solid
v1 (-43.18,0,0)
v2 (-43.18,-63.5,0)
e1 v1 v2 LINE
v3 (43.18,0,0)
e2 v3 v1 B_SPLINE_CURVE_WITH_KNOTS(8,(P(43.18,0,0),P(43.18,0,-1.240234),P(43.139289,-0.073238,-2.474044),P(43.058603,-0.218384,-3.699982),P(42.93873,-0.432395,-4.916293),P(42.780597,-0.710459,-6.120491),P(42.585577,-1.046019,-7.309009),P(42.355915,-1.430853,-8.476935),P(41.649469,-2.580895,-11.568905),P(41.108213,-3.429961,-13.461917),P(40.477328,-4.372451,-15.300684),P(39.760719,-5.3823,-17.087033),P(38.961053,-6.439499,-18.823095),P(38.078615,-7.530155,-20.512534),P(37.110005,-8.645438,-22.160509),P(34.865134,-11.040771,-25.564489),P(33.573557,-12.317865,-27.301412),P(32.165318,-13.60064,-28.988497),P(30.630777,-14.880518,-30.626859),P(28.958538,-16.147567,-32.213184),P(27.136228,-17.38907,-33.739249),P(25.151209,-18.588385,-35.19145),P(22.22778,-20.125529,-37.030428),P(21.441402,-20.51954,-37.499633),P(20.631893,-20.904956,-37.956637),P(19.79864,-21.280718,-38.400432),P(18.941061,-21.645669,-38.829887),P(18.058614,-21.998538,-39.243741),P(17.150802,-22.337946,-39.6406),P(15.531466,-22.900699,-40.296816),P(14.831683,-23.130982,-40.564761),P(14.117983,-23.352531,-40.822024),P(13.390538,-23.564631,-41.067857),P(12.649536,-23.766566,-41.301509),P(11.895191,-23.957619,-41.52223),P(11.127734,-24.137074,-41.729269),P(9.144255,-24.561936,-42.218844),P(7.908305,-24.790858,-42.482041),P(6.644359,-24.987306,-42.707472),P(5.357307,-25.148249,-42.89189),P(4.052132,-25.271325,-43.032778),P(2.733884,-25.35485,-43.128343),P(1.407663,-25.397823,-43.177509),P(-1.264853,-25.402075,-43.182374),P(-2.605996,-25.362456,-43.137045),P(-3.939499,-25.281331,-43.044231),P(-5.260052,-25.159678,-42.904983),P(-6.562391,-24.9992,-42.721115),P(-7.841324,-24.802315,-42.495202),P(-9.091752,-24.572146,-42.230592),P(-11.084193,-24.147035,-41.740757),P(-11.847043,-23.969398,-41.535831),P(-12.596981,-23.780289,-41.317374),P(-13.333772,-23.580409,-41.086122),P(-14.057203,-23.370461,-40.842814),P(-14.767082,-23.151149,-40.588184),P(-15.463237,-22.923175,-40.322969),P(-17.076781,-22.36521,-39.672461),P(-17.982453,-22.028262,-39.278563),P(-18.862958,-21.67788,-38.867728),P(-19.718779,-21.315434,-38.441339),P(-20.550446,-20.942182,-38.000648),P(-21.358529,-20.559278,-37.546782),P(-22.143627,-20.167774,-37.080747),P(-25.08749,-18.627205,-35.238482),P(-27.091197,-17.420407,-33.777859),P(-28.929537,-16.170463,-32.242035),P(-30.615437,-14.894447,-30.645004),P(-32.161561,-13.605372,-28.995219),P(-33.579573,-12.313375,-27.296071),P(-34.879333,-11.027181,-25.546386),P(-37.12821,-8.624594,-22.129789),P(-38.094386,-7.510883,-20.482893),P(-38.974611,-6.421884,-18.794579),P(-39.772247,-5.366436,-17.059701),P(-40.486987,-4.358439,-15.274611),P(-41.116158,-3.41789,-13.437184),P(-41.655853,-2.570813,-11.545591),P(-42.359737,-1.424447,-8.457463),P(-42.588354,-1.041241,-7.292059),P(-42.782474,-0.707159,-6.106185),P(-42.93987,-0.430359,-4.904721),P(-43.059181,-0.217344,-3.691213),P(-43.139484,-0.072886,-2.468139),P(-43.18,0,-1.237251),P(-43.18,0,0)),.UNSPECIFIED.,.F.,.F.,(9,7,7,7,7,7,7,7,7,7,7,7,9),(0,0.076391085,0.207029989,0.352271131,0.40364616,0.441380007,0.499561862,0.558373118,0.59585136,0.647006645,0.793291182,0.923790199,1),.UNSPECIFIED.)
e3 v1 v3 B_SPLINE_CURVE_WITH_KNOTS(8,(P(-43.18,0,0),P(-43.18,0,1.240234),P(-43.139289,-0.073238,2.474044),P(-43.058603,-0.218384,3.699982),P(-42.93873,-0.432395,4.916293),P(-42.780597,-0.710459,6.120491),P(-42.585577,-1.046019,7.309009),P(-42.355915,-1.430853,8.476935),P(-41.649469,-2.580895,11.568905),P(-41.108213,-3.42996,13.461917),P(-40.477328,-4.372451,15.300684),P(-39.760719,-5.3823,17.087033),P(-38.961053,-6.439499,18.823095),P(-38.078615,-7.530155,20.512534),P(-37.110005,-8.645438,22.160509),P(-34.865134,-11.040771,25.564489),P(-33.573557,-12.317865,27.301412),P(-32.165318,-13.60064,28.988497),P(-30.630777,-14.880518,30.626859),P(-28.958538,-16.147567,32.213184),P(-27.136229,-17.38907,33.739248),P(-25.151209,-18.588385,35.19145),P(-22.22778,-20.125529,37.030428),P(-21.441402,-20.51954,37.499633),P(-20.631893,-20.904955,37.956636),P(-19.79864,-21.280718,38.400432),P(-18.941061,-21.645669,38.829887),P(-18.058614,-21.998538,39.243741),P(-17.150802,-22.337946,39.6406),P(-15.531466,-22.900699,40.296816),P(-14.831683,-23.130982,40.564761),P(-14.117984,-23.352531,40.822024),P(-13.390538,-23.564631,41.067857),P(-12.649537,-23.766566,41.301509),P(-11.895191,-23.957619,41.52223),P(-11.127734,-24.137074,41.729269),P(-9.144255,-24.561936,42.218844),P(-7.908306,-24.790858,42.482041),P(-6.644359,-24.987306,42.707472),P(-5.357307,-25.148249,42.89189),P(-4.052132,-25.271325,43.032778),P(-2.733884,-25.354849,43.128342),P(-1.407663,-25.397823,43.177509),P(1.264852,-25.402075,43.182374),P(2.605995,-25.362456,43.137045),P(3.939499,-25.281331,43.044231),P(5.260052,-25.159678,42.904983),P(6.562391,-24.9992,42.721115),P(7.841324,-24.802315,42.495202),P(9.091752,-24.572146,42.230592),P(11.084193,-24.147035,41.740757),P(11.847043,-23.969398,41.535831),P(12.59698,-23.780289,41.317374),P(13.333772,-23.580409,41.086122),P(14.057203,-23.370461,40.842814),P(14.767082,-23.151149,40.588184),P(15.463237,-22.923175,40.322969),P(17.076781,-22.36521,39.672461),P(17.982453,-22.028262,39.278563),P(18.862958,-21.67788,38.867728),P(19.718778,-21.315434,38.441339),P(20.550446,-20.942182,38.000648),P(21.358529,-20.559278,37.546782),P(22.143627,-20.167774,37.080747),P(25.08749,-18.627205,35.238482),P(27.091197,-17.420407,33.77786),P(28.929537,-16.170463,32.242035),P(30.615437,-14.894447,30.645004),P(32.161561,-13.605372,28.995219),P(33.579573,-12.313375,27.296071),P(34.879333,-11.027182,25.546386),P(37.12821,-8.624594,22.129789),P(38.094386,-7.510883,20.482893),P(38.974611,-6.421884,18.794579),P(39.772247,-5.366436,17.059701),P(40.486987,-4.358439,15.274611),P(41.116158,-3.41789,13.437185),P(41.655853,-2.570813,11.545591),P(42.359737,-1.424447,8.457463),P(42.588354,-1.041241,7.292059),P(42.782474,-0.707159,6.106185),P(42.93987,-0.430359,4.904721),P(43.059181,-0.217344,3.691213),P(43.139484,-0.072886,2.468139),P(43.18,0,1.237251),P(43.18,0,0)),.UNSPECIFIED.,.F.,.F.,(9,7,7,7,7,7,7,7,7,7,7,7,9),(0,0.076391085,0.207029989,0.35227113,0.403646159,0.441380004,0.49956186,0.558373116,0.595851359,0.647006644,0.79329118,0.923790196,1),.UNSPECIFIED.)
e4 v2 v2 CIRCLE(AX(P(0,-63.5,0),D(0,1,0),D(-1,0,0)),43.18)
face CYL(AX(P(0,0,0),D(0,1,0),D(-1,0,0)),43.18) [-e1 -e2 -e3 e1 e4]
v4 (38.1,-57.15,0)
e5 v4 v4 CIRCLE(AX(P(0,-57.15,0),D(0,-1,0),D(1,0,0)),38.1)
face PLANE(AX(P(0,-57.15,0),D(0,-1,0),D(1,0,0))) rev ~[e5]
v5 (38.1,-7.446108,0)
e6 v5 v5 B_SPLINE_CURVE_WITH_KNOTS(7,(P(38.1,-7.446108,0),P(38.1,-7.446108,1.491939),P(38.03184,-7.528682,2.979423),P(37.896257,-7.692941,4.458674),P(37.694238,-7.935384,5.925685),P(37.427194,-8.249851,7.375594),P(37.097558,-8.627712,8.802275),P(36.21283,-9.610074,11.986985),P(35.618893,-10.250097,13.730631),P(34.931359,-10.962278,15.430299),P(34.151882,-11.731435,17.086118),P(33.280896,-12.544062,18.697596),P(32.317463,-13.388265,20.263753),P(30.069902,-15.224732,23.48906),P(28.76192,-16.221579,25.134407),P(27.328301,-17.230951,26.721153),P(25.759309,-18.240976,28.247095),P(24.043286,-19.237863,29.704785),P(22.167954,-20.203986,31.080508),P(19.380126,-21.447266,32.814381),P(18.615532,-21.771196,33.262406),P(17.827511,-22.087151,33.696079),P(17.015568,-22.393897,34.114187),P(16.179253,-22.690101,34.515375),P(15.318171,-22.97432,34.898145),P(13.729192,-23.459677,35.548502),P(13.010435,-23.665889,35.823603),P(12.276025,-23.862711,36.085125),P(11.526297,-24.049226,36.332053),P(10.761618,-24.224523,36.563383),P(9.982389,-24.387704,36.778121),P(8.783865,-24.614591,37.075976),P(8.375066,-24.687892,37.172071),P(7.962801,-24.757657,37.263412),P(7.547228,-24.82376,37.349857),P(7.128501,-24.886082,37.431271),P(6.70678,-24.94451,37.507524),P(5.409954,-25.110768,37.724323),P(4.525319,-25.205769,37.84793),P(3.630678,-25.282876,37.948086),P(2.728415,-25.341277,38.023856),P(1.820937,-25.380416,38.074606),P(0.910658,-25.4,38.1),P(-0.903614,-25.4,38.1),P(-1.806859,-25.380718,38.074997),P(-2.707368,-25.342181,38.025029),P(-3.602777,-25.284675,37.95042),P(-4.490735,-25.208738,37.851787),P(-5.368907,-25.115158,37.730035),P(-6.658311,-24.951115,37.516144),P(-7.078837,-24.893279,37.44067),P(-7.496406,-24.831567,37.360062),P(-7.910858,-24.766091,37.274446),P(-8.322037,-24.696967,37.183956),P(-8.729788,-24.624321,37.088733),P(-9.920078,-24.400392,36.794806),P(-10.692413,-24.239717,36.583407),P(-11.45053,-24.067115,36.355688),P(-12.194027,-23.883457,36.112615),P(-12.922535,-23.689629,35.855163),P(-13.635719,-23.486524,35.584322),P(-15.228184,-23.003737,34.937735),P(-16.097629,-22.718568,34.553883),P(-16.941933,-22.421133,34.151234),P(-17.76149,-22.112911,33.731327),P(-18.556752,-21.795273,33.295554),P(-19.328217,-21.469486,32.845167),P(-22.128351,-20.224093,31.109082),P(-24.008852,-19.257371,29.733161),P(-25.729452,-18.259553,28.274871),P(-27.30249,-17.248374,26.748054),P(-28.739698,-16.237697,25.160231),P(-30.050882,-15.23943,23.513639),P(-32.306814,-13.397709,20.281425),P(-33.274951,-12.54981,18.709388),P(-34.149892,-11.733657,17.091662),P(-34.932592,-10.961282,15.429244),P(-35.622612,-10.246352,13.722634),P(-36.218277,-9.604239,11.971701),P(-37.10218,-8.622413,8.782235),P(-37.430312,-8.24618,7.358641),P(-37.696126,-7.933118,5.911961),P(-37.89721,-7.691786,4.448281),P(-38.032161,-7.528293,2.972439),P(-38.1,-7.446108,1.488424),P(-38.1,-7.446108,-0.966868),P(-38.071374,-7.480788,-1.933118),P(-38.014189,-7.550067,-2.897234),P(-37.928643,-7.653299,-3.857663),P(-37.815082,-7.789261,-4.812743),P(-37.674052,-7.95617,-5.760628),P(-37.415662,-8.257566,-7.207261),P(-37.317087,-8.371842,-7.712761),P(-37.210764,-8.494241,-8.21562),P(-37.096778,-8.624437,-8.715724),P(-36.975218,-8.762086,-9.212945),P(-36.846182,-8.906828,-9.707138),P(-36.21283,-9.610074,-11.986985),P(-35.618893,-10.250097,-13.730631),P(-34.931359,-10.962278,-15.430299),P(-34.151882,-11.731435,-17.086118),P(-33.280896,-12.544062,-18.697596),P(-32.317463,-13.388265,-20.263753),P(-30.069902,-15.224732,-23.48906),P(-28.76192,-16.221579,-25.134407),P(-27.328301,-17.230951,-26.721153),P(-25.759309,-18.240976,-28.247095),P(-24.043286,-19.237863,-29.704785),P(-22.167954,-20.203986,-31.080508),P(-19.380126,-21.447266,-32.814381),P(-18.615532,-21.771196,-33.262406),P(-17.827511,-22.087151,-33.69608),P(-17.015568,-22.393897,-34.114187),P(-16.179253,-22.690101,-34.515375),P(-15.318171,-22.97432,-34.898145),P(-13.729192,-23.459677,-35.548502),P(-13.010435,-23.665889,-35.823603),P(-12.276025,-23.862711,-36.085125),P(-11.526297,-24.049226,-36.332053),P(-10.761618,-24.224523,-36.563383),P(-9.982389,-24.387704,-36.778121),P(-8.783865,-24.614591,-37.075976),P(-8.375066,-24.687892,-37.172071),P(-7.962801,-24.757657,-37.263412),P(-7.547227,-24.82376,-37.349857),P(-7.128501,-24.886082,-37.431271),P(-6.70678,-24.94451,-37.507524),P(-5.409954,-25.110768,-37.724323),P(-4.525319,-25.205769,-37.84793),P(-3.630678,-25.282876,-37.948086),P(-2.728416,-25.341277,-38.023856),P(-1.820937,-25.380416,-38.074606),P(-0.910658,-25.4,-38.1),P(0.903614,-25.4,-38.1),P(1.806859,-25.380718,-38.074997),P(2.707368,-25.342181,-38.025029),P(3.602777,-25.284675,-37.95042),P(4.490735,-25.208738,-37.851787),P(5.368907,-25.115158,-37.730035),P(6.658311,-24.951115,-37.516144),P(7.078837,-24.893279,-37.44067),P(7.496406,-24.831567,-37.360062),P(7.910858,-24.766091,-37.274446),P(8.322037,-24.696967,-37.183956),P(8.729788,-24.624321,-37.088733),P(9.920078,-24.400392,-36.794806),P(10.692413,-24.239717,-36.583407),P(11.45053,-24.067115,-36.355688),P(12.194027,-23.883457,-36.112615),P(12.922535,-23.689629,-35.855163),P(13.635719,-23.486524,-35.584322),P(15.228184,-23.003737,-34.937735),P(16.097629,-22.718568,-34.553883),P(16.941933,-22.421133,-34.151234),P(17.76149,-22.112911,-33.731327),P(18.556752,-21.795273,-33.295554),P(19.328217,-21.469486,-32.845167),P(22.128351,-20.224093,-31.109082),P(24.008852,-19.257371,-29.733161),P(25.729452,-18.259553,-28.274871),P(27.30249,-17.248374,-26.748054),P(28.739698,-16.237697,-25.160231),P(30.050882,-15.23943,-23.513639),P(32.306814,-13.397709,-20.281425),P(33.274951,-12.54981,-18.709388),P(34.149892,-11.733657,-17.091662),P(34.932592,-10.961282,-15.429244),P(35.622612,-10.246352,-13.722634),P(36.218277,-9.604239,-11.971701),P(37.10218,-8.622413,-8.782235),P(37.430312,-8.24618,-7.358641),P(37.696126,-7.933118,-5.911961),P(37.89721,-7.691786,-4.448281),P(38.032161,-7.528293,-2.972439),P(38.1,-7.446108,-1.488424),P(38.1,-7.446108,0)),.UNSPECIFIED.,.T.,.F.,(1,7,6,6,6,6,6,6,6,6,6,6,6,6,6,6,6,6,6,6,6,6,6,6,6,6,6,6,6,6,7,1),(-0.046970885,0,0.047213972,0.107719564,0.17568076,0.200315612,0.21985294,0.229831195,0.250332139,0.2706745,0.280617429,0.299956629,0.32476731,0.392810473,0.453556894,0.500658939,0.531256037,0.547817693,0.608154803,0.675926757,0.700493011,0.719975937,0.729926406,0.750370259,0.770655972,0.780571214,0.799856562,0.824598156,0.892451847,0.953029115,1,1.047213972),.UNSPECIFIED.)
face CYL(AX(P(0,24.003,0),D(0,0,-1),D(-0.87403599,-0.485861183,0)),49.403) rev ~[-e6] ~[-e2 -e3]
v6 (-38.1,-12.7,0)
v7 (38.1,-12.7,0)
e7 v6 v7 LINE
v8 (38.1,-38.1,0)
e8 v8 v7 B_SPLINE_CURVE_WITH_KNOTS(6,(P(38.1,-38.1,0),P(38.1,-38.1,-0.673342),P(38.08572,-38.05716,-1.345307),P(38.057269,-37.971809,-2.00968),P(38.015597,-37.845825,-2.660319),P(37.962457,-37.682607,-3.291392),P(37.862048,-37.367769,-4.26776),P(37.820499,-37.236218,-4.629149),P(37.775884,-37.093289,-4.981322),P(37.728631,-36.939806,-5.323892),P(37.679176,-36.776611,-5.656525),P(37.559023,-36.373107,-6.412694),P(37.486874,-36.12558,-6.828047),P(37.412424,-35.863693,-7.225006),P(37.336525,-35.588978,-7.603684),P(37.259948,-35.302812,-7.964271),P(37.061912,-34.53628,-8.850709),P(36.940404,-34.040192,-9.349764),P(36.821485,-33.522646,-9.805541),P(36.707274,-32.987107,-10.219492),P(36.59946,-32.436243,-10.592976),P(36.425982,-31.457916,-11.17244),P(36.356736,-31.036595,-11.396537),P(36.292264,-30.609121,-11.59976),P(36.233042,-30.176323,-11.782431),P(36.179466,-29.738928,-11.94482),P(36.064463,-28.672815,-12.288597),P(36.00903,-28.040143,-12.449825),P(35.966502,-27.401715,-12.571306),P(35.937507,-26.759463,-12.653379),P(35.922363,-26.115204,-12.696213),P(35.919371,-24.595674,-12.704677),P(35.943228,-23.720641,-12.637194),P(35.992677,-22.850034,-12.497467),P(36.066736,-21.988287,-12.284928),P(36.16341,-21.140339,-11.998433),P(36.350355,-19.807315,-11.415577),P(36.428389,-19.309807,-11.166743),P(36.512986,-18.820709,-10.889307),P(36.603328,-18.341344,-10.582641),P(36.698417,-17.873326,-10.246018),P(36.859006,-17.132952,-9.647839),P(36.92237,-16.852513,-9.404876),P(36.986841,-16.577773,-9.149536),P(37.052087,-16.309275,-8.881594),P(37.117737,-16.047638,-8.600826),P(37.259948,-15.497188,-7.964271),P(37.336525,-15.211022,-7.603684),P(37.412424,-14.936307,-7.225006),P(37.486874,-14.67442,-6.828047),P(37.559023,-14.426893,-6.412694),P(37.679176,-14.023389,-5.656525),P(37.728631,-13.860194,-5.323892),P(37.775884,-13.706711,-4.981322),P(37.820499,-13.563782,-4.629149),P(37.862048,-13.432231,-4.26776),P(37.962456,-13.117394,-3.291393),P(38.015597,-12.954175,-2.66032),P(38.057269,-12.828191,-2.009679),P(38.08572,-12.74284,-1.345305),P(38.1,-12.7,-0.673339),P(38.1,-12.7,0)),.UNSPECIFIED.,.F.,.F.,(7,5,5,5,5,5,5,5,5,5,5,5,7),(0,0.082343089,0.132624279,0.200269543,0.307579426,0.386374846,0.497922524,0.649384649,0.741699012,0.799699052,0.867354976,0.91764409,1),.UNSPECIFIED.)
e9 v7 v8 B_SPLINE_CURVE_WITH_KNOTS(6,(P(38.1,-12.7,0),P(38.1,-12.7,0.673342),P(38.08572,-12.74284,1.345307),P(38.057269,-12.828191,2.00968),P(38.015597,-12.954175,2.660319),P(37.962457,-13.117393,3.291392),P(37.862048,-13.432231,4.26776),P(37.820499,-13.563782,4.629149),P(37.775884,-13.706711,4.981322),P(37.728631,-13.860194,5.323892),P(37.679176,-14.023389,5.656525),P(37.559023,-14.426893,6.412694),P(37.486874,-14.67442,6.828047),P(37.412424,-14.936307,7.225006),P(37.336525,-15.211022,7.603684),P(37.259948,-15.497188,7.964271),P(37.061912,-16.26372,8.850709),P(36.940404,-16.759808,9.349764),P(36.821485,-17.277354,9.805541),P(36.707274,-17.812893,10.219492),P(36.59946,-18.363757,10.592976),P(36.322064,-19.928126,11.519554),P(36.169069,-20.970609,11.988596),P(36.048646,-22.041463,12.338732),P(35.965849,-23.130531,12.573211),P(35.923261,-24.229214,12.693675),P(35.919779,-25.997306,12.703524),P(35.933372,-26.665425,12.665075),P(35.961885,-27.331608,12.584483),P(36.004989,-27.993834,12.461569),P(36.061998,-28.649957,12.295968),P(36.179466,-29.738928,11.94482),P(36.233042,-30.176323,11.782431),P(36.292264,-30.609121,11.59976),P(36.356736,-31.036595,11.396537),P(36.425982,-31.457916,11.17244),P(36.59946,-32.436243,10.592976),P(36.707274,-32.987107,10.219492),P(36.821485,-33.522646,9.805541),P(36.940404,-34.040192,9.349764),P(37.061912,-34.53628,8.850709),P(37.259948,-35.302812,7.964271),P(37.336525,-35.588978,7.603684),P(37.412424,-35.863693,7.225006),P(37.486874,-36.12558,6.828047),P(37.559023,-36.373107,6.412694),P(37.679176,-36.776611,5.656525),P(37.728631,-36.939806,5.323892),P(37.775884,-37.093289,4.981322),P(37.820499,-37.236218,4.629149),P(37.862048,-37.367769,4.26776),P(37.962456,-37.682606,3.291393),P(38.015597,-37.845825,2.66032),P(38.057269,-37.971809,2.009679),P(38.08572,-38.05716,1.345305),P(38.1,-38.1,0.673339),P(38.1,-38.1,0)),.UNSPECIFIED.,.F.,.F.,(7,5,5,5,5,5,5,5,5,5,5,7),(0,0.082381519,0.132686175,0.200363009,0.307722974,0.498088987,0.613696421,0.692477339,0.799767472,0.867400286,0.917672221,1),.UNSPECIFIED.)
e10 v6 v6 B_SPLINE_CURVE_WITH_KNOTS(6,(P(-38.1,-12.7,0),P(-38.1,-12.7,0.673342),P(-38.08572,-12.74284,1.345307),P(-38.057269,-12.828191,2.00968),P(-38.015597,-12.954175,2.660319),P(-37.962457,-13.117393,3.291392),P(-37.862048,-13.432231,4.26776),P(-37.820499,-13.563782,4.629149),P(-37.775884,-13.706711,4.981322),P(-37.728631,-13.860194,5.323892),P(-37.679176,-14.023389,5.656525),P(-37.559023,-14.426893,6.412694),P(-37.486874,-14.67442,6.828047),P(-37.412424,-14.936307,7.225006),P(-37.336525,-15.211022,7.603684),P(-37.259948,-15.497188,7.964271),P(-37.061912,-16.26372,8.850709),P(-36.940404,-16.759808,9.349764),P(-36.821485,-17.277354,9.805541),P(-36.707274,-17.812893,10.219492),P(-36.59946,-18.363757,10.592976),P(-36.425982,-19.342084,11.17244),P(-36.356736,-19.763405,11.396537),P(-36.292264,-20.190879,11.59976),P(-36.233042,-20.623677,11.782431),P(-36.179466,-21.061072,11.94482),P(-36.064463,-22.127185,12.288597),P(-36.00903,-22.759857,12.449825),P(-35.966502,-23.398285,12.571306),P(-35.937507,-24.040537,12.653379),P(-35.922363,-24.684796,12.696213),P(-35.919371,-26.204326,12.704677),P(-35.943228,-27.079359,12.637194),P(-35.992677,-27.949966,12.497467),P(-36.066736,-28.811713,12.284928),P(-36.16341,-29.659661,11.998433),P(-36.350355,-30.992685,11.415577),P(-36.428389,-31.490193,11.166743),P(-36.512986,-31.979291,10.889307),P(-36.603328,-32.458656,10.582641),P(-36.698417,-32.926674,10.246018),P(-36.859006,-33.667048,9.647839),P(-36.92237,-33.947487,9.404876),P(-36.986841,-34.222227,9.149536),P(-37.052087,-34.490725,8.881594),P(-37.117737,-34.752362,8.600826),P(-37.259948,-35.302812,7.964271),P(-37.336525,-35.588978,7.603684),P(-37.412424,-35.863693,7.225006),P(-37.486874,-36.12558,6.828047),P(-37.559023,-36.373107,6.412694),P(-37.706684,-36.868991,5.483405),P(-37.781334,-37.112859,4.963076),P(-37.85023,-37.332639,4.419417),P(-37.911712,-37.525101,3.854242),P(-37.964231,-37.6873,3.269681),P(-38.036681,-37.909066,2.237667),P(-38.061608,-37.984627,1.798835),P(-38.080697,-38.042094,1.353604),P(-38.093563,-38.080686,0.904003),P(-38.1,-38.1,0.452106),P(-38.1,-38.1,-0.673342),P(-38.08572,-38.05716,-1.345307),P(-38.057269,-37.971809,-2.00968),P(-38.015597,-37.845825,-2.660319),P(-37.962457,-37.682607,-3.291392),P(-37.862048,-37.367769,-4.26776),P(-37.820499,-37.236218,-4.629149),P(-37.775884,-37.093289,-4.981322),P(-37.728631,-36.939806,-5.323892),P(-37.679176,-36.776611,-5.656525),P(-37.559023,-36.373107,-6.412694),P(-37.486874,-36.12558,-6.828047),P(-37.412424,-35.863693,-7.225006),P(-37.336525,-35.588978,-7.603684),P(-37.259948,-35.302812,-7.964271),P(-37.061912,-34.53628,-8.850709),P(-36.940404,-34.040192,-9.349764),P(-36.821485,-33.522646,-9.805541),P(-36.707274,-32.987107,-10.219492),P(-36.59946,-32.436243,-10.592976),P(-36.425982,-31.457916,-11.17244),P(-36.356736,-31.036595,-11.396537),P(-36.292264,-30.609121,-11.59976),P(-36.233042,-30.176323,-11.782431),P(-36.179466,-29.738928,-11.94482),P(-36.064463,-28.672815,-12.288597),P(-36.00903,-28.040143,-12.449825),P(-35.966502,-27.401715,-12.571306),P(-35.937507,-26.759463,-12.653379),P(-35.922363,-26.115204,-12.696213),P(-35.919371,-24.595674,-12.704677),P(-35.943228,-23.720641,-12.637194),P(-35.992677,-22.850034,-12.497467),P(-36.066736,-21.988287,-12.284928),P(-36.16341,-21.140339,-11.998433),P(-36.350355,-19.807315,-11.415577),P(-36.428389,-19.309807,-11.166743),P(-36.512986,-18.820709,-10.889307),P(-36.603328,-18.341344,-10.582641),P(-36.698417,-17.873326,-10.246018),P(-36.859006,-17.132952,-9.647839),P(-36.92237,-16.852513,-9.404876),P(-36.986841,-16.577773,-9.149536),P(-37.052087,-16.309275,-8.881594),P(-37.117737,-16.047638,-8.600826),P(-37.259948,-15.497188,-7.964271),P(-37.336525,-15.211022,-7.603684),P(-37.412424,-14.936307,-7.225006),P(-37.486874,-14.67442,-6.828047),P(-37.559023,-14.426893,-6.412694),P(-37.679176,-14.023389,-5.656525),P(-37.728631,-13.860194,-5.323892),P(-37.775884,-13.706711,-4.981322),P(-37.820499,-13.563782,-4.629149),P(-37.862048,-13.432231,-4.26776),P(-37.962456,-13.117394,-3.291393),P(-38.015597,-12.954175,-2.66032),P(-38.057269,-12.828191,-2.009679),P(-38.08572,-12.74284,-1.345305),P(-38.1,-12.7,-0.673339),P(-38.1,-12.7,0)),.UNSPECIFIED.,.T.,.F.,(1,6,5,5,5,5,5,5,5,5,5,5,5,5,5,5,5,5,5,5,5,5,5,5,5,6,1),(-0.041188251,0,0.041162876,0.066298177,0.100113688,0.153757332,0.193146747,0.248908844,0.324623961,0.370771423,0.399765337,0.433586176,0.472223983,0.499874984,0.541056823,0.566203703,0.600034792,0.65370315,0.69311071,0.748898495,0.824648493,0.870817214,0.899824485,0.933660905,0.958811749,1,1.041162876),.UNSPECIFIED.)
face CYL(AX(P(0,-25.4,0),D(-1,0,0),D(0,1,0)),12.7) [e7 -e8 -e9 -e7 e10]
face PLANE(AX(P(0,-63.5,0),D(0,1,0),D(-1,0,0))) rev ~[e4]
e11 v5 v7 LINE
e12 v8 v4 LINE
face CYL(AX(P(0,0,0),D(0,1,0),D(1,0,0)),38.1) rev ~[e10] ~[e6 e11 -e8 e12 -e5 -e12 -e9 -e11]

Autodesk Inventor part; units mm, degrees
ref_plane "YZ Plane" through (0, 0, 0) normal (1, 0, 0) x (0, 1, 0)
sketch "Sketch1" plane through (0, 0, 0) normal (0, 1, 0) x (-1, 0, 0)
  circle A0 centre (0, 0) radius 43.18
  dimension "d0" = 86.36
extrude "Extrusion1" add sketch "Sketch1" against normal blind 63.5
sketch "Sketch2" plane through (0, 0, 0) normal (0, 0, 1) x (1, 0, 0)
  line L0 (-43.18, 0) -> (43.18, 0) projected
  arc A0 (-43.18, 0) -> (43.18, 0) centre (0, 24.003) ccw
  line L1 (-43.18, -63.5) -> (43.18, -63.5) projected
  point P0 (0, 0)
  dimension "d4" = 38.1
extrude "Extrusion2" cut sketch "Sketch2" along normal mid plane 101.6
ref_plane "Work Plane1" through (0, 0, 0) normal (0, -1, 0) x (1, 0, 0)
sketch "Sketch3" plane through (0, 0, 0) normal (0, -1, 0) x (1, 0, 0)
  circle A0 centre (0, 0) radius 38.1
  dimension "d8" = 76.2
extrude "Extrusion3" cut sketch "Sketch3" along normal blind 57.15
sketch "Sketch4" plane through (0, 0, 0) normal (1, 0, 0) x (0, 1, 0)
  circle A0 centre (-25.4, 0) radius 12.7
  point P0 (0, 0)
  dimension "d11" = 25.4
  dimension "d12" = 25.4
  dimension "d13" = 0
extrude "Extrusion4" add sketch "Sketch4" along normal mid plane 78.74
sketch "Sketch5" plane through (0, 0, 0) normal (1, 0, 0) x (0, 1, 0)
  circle A0 centre (-25.4, 0) radius 13.97
  arc A1 (-25.4, 17.145) -> (-25.4, -17.145) centre (-25.4, 0) ccw
  line L0 (-63.5, 43.18) -> (-63.5, -43.18) projected
  circle A2 centre (93.98, 0) radius 20.32
  arc A3 (90.484, -25.1583) -> (93.98, 25.4) centre (93.98, 0) ccw
  line L1 (93.98, 25.4) -> (-25.4, 17.145)
  line L2 (90.484, -25.1583) -> (-25.4, -17.145)
  point P0 (0, 0)
  point P1 (-25.4, 12.7)
  dimension "d16" = 27.94
  dimension "d17" = 34.29
  dimension "d18" = 38.1
  dimension "d19" = 43.18
  dimension "d20" = 40.64
  dimension "d21" = 0
  dimension "d22" = 119.38
  dimension "d23" = 50.8
extrude "Extrusion5" add sketch "Sketch5" along normal mid plane 31.75
sketch "Sketch6" plane through (0, 0, 0) normal (1, 0, 0) x (0, 1, 0)
  circle A0 centre (93.98, 0) radius 20.32 construction
  line L0 (93.98, 0) -> (93.98, -43.5701)
  line L1 (93.98, 0) -> (93.98, 40.9183)
  line L2 (93.98, 40.9183) -> (142.8926, 40.9183)
  line L3 (142.8926, 40.9183) -> (133.2711, -47.8298)
  line L4 (133.2711, -47.8298) -> (93.98, -43.5701)
  point P0 (0, 0)
extrude "Extrusion6" cut sketch "Sketch6" along normal mid plane 2540
ref_plane "Work Plane2" through (0, 0, -22.86) normal (0, 0, 1) x (1, 0, 0)
sketch "Sketch7" plane through (0, 0, -22.86) normal (0, 0, 1) x (1, 0, 0)
  line L0 (15.875, 90.484) -> (15.875, 93.98) projected
  line L1 (-15.875, -25.4) -> (-15.875, 93.98) construction
  line L2 (15.875, 93.98) -> (-15.875, 93.98)
  line L3 (-15.875, 93.98) -> (-15.875, 88.9)
  line L4 (-15.875, 88.9) -> (15.875, 88.9)
  line L5 (15.875, 88.9) -> (15.875, 93.98)
  point P0 (0, 0)
  dimension "d29" = 5.08
extrude "Extrusion7" add sketch "Sketch7" against normal blind 6.35
mirror "Mirror1" about plane through (0, 0, 0) normal (0, 0, 1) of "Extrusion7"
sketch "Sketch8" plane through (15.875, 0, 0) normal (1, 0, 0) x (0, 0, -1)
  circle A0 centre (0, -25.4) radius 13.97 projected
  line L0 (-20.32, 93.98) -> (-29.21, 93.98) projected
  arc A1 (-20.32, 93.98) -> (20.32, 93.98) centre (0, 93.98) ccw projected
  line L1 (20.32, 93.98) -> (29.21, 93.98) projected
  line L2 (29.21, 88.9) -> (29.21, 93.98) projected
  line L3 (25.0487, 88.9) -> (29.21, 88.9) projected
  line L4 (25.0487, 88.9) -> (17.145, -25.4) projected
  arc A2 (-17.145, -25.4) -> (17.145, -25.4) centre (0, -25.4) ccw projected
  line L5 (-17.145, -25.4) -> (-25.0487, 88.9) projected
  line L6 (-25.0487, 88.9) -> (-29.21, 88.9) projected
  line L7 (-29.21, 88.9) -> (-29.21, 93.98) projected
  point P0 (0, 0)
extrude "Extrusion8" cut sketch "Sketch8" against normal blind 38.1
properties part number "PistonsHead"
